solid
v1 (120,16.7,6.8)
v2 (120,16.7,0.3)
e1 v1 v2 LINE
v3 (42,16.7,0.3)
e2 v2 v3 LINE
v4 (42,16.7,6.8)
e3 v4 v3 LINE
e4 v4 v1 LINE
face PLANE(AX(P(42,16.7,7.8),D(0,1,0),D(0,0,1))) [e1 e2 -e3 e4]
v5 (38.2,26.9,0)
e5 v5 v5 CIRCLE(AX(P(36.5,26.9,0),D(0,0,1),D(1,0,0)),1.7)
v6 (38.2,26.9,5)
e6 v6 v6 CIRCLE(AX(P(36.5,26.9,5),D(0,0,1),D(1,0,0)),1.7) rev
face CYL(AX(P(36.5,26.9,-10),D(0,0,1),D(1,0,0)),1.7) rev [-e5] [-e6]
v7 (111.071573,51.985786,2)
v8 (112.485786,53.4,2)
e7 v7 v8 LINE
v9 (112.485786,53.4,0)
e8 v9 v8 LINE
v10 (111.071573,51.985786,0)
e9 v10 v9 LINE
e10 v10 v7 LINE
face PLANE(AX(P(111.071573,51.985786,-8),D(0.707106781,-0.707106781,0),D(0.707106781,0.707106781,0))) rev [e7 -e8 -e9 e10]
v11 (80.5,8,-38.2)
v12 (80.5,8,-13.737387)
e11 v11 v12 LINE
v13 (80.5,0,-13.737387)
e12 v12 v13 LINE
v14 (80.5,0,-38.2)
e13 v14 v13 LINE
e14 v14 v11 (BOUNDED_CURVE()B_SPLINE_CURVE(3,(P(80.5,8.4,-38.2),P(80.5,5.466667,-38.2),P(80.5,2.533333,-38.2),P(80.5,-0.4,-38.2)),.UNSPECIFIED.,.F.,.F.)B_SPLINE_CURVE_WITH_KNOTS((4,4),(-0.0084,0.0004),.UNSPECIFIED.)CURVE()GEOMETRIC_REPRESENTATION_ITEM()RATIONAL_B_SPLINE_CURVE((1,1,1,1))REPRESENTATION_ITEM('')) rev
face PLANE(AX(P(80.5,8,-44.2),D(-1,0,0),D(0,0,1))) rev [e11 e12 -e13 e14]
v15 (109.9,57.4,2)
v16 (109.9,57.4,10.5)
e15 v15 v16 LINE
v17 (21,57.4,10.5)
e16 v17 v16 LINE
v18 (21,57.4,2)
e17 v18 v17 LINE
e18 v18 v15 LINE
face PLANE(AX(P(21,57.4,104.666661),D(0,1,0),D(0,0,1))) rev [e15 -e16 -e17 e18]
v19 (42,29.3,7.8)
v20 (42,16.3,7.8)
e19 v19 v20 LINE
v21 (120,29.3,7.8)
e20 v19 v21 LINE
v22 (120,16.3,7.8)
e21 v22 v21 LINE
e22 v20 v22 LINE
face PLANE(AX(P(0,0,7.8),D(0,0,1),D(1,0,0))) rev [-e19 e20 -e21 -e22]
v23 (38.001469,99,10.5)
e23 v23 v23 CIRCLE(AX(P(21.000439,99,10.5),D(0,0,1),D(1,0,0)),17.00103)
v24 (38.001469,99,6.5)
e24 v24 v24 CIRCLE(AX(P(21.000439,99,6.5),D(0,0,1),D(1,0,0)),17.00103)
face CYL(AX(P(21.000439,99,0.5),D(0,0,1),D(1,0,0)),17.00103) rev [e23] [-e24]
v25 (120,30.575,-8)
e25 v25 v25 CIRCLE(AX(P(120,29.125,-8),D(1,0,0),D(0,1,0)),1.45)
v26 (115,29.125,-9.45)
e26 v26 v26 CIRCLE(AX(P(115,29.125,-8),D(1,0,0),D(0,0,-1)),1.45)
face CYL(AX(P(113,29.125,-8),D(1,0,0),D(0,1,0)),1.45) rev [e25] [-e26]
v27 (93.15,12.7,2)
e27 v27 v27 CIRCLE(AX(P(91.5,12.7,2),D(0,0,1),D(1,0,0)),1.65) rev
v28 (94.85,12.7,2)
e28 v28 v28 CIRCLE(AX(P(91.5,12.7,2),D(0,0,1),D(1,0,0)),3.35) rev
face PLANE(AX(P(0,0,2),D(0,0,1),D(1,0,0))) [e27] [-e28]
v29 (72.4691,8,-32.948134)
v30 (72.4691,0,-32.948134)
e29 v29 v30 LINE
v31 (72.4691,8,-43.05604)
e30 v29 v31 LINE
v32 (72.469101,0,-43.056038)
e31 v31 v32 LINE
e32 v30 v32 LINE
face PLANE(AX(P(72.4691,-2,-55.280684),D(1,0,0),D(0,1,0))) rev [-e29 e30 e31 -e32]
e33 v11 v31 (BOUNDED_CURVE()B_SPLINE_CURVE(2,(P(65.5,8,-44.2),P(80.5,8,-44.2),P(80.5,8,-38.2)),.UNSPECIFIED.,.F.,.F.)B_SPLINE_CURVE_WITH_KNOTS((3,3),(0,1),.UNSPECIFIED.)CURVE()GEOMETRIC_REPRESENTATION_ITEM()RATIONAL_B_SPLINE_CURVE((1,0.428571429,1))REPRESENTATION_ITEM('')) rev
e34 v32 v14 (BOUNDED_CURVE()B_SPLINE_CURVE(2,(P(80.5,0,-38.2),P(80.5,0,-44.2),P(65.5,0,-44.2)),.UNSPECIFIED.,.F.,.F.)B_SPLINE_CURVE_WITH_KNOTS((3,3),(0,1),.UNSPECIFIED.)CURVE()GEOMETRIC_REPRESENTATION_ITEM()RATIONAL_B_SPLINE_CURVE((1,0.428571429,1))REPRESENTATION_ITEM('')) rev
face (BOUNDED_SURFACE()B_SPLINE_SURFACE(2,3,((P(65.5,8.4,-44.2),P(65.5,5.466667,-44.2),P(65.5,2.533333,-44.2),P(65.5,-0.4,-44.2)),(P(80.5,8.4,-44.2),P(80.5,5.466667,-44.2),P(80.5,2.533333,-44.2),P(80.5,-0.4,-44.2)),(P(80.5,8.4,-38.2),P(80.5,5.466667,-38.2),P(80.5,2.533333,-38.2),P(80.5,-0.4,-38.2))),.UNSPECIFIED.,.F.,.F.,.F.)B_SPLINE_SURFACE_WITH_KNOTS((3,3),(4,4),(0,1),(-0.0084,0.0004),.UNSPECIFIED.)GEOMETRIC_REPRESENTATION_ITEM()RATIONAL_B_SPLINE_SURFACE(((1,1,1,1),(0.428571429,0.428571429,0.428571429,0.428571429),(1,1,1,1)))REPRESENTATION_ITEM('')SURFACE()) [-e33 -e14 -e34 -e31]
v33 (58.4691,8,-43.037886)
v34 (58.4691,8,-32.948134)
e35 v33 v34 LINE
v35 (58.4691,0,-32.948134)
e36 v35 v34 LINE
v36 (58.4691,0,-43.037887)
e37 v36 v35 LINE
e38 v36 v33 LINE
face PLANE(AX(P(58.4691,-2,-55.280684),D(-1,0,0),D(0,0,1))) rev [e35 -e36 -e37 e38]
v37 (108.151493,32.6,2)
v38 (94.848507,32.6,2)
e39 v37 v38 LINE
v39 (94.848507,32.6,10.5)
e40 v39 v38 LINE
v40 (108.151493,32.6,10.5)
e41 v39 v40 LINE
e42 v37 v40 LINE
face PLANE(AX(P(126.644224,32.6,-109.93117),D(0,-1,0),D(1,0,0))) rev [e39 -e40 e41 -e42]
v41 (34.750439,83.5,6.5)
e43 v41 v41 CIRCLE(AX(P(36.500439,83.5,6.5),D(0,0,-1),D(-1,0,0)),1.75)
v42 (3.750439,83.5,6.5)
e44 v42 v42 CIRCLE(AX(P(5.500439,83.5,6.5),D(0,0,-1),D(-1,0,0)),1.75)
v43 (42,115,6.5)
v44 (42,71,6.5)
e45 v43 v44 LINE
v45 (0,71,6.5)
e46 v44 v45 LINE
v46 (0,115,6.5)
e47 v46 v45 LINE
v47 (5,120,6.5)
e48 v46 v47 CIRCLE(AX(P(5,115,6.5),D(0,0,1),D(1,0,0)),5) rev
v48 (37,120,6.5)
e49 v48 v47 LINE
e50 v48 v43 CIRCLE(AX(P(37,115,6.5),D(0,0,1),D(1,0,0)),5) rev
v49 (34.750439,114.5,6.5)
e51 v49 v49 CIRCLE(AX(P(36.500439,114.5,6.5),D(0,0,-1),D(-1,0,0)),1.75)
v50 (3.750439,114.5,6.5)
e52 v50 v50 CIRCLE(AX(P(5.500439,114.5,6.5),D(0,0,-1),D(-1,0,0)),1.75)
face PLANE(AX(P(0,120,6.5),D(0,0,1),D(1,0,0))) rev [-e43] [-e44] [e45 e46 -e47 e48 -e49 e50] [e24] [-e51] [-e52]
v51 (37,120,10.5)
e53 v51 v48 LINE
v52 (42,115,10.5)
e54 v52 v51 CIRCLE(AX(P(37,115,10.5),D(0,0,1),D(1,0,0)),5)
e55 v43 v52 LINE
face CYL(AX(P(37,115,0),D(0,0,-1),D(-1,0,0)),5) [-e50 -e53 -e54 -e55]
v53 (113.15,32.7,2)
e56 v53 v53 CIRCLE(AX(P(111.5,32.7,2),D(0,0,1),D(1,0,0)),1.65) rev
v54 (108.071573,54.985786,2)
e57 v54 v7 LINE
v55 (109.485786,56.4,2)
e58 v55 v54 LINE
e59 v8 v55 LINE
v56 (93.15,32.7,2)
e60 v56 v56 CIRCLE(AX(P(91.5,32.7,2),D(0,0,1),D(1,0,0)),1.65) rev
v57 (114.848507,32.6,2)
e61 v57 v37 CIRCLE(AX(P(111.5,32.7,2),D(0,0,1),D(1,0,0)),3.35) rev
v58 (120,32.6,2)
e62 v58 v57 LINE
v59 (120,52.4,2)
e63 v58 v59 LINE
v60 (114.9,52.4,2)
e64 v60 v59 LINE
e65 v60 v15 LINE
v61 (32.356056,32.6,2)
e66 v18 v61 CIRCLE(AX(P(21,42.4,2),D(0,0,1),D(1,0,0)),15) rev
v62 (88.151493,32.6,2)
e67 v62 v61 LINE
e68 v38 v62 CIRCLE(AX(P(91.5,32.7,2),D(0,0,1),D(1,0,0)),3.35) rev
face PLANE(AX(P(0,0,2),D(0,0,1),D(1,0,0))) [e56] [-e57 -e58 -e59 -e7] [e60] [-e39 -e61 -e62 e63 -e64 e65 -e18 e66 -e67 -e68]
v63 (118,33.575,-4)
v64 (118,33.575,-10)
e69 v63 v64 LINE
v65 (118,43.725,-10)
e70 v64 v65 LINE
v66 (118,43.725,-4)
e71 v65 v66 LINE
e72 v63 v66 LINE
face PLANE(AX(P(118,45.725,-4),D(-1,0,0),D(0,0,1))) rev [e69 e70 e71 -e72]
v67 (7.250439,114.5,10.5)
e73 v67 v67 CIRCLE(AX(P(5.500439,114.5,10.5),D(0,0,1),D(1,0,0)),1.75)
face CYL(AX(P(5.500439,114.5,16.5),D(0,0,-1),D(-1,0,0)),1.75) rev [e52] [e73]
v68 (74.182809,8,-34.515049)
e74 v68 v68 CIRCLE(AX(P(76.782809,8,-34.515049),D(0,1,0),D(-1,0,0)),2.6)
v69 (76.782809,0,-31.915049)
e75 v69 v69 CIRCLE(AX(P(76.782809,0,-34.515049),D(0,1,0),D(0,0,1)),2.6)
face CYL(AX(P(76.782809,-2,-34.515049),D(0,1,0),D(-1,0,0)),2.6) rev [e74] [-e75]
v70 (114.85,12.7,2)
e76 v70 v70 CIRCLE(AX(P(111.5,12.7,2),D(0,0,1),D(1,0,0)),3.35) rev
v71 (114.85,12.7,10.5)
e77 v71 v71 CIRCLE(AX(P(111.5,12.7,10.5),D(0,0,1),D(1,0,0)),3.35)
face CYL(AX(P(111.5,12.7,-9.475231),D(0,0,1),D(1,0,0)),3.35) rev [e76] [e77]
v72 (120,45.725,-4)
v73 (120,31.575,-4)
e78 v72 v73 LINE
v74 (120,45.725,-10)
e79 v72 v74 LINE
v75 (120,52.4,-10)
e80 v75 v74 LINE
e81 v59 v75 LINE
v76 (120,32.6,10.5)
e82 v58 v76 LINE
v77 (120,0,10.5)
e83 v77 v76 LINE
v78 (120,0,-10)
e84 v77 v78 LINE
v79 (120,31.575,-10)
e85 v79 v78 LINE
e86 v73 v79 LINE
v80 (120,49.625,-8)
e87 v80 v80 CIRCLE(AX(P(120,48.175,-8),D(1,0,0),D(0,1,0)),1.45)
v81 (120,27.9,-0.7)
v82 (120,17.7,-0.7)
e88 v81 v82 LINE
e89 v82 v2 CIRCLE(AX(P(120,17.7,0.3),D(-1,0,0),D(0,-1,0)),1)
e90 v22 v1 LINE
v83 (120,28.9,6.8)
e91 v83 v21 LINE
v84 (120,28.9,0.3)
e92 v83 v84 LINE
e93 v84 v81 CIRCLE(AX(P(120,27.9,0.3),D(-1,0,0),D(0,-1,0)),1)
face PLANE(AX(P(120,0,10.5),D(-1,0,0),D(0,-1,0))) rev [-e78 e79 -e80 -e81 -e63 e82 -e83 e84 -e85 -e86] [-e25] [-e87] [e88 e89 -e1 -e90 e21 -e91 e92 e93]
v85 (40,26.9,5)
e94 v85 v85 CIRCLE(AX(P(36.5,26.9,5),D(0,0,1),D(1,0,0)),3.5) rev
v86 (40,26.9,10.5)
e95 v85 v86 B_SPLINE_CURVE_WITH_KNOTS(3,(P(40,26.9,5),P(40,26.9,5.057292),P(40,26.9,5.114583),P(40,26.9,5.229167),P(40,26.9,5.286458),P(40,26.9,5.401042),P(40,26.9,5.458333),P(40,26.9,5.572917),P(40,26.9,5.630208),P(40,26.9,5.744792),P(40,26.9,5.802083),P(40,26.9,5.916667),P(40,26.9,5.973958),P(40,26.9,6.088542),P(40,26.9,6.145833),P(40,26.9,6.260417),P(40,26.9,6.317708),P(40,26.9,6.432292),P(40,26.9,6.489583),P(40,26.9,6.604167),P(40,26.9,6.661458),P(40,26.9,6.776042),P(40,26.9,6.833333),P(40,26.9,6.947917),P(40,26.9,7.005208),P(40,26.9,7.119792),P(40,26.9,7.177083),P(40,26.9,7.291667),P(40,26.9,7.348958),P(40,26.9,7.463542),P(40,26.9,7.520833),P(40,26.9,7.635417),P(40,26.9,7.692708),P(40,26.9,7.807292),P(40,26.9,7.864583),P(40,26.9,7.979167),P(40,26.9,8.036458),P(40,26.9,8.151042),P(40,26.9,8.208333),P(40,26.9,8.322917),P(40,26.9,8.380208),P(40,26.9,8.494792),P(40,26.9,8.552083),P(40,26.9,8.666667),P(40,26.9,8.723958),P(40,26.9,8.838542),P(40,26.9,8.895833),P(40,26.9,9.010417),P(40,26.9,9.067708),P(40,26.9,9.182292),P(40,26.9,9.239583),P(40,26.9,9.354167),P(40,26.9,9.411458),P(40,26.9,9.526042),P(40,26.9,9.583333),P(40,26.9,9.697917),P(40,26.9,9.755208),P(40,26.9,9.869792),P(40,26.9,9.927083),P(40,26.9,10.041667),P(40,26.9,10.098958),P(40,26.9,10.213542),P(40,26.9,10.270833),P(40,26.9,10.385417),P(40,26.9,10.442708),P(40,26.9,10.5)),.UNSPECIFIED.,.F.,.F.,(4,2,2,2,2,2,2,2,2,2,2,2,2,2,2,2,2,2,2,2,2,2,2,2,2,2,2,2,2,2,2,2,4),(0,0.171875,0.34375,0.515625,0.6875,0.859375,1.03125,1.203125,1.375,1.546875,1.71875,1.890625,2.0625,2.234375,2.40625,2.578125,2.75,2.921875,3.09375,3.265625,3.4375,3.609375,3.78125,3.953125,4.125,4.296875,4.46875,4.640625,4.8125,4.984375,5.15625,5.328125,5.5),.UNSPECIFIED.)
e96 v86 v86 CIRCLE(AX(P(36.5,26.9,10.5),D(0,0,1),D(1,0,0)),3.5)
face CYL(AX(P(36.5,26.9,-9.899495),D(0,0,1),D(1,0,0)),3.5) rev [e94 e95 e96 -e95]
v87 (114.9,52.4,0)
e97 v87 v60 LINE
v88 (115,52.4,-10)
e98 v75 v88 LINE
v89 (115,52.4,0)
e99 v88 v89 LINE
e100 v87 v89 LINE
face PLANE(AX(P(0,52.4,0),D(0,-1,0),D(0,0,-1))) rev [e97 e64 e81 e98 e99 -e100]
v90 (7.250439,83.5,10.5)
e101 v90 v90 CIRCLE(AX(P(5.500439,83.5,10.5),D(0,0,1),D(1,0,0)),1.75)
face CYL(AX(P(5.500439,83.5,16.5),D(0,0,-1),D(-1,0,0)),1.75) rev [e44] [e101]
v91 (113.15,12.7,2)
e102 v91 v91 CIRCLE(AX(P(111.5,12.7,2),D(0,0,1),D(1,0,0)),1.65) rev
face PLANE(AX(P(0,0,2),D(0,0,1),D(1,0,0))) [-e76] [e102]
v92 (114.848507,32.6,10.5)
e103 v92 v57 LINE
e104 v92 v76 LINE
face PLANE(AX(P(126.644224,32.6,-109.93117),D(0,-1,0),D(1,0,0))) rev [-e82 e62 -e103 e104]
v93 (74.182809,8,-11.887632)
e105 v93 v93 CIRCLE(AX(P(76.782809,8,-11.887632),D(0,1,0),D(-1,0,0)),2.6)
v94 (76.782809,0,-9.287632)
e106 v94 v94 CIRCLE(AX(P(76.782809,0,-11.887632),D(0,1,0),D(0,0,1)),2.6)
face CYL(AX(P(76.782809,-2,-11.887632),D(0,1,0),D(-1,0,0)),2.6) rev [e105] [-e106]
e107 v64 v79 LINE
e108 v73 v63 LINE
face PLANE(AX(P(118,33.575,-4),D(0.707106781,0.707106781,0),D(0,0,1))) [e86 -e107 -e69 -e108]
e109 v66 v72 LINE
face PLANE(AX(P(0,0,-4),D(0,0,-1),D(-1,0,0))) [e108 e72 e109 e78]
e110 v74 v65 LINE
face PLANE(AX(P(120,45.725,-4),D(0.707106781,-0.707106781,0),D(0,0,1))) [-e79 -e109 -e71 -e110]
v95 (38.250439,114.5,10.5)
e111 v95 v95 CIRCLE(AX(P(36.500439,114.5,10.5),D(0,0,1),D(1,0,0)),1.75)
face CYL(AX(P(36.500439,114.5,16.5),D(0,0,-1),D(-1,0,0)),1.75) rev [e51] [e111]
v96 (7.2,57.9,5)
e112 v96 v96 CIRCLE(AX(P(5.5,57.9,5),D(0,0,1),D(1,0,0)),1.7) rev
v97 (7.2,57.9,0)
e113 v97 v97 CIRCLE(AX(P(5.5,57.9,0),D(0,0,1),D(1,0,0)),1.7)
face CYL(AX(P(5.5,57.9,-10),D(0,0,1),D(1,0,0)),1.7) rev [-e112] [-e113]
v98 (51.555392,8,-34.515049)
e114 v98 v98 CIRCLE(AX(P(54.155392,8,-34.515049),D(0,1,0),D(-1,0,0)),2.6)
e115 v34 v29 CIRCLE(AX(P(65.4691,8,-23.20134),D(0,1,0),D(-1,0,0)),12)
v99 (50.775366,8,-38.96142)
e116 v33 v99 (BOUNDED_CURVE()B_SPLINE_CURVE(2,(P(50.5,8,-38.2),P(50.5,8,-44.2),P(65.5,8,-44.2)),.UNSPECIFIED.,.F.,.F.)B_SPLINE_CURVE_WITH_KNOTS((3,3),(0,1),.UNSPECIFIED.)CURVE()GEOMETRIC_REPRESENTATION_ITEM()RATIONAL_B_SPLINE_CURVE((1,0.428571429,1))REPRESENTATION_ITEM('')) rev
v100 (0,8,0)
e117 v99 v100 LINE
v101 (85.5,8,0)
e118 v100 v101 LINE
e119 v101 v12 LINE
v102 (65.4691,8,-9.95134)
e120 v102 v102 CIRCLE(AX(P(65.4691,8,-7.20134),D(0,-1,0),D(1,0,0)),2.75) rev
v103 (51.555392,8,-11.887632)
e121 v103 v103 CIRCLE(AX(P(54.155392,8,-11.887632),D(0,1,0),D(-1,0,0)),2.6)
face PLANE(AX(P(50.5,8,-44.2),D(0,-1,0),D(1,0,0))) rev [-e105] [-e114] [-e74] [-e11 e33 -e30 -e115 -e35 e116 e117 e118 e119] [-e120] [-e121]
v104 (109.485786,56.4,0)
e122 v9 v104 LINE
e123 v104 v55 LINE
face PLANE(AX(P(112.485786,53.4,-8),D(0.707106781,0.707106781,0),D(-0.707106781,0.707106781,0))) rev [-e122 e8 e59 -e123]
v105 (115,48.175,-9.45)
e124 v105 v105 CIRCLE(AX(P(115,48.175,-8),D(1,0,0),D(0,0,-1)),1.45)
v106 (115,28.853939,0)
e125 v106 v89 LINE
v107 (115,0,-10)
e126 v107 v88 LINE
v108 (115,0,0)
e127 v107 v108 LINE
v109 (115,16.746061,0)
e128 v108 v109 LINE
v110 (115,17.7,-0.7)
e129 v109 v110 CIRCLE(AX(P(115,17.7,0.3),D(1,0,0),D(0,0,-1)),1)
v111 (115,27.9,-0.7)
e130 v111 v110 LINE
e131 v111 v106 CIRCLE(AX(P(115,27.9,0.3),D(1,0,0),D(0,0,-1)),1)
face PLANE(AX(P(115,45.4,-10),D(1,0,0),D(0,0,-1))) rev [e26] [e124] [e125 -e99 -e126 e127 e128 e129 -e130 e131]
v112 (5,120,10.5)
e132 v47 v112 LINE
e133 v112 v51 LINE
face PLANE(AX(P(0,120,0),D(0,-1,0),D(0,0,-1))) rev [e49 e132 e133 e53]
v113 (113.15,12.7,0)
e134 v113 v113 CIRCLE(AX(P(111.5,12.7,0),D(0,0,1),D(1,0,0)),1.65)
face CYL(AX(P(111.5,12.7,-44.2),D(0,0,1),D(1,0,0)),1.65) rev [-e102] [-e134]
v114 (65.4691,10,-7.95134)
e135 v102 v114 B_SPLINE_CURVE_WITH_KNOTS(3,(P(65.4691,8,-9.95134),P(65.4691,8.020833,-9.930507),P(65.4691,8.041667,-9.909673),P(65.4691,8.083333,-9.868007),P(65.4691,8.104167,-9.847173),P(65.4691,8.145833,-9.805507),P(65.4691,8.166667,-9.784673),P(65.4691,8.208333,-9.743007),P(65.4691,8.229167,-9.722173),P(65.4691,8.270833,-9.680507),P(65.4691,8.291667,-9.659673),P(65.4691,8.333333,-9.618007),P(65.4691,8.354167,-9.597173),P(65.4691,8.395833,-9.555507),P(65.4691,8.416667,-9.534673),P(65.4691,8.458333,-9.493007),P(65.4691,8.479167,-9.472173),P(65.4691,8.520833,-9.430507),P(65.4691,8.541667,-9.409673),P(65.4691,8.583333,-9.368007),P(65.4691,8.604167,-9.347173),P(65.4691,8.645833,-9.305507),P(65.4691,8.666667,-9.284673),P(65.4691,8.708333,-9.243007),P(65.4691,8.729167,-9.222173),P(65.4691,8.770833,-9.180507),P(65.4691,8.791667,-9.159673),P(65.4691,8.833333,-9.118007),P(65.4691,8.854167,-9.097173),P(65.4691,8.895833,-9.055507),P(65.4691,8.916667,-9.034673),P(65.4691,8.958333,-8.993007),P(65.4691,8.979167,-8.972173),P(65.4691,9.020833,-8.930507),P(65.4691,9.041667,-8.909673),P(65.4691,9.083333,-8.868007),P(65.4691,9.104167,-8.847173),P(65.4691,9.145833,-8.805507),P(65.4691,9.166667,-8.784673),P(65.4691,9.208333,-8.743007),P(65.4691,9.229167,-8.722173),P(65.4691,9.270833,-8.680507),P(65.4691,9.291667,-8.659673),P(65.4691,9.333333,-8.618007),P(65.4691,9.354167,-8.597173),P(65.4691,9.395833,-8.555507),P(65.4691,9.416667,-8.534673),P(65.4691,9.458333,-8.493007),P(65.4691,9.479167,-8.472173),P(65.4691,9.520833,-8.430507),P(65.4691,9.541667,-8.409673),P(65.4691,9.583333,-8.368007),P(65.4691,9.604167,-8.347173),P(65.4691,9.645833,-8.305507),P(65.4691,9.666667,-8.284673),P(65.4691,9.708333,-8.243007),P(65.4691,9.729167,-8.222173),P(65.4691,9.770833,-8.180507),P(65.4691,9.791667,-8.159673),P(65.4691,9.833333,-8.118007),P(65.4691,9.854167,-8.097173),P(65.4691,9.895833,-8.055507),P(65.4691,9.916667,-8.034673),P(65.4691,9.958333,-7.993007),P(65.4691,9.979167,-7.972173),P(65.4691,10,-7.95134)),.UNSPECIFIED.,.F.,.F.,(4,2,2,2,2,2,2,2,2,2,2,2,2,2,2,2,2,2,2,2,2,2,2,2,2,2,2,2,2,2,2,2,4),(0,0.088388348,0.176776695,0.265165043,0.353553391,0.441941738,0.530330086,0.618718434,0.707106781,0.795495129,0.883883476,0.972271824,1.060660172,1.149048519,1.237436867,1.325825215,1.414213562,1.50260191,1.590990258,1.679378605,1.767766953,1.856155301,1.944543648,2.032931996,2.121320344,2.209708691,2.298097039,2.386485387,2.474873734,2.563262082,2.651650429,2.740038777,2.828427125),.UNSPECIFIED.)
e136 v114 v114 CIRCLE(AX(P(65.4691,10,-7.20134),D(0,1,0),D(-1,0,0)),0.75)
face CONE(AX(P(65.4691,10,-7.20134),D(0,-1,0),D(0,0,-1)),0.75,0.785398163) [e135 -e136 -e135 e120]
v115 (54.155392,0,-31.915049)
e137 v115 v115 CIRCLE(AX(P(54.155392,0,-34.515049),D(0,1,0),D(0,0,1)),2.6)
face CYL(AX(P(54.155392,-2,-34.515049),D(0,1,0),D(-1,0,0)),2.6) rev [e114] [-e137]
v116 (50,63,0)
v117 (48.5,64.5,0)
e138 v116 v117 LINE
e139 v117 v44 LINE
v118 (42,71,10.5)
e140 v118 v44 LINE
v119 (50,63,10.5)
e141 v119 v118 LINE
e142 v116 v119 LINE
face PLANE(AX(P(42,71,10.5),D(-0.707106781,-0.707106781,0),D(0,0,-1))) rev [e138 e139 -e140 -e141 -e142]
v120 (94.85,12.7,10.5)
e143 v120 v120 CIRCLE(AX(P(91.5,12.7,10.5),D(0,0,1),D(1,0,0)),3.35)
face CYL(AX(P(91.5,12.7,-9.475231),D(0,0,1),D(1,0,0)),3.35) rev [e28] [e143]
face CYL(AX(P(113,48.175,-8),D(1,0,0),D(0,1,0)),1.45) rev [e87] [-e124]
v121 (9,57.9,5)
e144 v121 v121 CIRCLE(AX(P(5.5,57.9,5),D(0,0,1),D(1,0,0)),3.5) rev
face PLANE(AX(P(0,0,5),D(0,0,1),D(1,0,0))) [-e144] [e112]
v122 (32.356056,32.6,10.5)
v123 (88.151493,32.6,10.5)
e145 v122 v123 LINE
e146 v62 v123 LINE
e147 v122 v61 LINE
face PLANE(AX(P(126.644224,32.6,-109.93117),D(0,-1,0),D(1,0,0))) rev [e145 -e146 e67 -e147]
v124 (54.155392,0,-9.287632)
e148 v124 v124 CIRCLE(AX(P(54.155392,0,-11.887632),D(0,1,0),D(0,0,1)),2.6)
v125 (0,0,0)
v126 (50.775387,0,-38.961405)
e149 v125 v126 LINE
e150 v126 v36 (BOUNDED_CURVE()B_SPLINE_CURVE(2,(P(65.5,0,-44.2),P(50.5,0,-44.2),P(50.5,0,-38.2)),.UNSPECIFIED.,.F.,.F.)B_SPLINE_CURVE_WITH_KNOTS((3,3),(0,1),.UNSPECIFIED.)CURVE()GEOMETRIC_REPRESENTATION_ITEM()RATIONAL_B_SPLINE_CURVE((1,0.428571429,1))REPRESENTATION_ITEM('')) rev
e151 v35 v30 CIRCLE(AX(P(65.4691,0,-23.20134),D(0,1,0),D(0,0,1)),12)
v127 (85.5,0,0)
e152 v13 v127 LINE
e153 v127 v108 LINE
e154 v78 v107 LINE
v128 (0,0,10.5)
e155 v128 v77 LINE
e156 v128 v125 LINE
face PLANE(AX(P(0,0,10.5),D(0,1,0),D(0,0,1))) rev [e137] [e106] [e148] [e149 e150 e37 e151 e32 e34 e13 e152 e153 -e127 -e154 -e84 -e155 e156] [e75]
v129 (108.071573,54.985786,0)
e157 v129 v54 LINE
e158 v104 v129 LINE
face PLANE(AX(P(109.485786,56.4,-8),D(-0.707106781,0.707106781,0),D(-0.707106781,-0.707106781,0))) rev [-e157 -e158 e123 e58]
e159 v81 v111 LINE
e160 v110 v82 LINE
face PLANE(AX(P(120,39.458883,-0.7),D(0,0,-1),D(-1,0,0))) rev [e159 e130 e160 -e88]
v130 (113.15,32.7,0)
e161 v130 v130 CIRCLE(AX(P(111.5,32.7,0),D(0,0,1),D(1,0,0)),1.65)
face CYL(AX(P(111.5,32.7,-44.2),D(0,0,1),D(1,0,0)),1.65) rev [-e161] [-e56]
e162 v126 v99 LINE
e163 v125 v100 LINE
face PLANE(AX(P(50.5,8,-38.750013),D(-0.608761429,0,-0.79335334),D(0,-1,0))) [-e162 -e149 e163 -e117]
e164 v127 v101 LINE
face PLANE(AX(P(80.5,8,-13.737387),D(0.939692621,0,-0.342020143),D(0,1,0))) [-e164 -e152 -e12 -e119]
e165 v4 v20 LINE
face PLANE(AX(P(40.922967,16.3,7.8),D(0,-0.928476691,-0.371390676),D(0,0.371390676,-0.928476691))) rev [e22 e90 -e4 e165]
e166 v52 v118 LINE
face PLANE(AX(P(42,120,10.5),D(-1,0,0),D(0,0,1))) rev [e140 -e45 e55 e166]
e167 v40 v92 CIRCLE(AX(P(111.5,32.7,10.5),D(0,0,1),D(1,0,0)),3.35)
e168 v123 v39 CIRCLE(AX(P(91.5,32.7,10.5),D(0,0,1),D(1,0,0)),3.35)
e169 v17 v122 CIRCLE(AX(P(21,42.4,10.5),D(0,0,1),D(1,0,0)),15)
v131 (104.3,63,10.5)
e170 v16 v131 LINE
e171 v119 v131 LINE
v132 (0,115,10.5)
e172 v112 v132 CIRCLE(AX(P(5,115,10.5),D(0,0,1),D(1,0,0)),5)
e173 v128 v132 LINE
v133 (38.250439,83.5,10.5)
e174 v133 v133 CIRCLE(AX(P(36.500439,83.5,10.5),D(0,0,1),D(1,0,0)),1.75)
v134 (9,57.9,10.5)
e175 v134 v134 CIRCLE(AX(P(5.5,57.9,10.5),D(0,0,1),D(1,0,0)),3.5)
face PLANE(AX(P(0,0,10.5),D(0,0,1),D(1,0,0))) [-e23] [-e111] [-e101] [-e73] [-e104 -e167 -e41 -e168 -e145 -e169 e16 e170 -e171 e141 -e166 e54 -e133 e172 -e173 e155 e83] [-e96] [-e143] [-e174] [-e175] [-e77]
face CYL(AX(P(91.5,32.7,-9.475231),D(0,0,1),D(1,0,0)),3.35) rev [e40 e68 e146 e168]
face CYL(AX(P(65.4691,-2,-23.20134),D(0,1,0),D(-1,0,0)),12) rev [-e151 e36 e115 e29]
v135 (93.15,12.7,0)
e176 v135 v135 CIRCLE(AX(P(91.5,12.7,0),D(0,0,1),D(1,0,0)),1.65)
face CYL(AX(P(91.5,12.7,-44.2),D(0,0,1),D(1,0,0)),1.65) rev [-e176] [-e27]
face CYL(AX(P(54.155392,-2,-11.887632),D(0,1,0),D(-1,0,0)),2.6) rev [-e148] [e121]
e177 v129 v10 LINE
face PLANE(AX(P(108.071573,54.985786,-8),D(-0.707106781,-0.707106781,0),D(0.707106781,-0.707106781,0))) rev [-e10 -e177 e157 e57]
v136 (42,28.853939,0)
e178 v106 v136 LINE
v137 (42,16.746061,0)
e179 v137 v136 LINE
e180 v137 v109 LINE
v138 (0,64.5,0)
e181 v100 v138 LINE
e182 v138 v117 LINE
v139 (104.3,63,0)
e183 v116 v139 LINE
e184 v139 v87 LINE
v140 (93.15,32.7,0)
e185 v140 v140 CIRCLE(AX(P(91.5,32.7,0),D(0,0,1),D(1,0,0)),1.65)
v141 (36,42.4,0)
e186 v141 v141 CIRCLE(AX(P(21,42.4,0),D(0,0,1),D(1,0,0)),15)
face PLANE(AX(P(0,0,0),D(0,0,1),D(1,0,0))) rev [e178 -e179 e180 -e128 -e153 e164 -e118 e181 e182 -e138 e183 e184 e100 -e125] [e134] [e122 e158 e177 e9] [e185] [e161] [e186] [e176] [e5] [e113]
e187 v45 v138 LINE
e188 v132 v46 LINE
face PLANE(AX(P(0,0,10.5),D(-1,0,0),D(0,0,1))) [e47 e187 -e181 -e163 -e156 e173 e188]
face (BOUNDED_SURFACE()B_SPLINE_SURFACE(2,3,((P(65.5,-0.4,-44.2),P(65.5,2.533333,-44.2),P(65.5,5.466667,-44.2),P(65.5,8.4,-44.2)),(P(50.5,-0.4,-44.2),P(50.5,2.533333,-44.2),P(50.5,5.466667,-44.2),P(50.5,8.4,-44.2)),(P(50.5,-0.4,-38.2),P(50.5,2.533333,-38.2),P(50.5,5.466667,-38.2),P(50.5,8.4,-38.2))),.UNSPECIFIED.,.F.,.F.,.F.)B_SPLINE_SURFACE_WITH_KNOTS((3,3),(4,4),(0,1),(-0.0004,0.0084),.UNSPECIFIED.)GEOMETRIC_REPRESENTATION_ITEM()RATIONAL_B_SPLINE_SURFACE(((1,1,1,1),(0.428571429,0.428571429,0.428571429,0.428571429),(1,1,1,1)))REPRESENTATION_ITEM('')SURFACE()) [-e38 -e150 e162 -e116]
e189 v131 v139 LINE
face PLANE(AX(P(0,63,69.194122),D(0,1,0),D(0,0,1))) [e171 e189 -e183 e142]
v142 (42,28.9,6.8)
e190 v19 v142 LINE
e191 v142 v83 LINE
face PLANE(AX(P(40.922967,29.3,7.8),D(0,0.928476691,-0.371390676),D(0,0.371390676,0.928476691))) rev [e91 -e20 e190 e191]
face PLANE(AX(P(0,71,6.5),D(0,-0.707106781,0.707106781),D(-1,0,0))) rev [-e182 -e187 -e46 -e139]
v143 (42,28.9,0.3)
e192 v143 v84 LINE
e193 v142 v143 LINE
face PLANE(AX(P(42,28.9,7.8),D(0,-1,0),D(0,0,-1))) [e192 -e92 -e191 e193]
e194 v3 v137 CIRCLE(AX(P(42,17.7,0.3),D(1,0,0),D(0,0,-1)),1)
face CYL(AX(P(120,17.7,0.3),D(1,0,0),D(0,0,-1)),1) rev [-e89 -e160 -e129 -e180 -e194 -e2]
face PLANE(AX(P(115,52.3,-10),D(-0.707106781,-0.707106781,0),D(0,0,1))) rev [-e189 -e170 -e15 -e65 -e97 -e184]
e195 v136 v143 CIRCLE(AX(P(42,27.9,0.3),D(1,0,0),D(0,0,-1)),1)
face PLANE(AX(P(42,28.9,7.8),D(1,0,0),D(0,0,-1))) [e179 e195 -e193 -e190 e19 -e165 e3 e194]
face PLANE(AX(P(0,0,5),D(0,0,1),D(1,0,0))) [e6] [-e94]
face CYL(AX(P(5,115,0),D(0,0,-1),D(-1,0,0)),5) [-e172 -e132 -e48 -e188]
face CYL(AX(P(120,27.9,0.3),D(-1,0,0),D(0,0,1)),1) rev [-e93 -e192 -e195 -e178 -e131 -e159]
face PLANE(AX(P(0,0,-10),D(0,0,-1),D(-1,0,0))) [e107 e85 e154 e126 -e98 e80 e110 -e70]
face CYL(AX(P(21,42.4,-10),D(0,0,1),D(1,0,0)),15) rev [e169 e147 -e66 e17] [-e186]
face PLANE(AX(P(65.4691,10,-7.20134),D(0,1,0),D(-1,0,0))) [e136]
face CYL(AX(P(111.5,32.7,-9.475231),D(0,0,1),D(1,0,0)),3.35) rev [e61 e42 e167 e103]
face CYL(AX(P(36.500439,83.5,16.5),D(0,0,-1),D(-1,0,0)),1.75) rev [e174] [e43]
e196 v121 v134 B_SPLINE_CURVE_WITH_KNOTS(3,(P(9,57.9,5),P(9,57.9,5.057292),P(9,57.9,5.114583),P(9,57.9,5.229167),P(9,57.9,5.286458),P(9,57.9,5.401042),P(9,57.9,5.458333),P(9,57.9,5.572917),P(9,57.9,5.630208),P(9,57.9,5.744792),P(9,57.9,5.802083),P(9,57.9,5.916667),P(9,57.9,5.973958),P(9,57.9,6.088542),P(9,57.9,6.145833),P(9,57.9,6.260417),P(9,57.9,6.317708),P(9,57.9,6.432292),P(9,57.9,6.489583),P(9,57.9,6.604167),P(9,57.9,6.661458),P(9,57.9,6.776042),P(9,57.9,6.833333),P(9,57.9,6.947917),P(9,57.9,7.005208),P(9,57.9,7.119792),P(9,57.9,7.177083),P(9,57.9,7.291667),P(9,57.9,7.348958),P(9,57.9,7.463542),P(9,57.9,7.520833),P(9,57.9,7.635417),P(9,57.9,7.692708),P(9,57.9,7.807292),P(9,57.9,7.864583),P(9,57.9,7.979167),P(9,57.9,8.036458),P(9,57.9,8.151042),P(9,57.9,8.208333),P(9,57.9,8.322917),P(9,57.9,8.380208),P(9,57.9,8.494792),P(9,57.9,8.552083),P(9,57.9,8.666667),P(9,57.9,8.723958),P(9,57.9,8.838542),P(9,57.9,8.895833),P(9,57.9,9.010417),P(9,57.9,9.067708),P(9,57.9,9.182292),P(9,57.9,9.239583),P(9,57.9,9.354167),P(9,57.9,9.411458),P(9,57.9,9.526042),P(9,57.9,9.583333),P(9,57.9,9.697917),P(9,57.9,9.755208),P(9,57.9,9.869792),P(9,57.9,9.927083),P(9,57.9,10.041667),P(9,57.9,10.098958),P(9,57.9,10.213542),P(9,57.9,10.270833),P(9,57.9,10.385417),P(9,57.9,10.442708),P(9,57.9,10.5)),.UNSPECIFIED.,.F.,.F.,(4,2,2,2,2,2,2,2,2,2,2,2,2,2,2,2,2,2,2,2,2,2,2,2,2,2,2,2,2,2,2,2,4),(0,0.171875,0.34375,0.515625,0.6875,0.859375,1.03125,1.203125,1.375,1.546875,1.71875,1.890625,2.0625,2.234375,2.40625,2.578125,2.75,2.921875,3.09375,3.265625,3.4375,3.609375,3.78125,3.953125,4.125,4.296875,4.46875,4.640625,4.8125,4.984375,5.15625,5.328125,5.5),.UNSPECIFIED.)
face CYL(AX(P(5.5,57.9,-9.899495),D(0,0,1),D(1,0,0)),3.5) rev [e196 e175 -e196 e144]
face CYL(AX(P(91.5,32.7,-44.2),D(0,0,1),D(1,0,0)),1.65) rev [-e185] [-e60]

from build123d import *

# Parameters (mm, degrees)
SKETCH1_W               = 120
SKETCH1_H               = 45.4
BOSS_EXTRUDE1_DEPTH     = 10.5
SKETCH2_W               = 5
SKETCH2_H               = 45.4
BOSS_EXTRUDE2_DEPTH     = 10
CUT_EXTRUDE1_DEPTH      = 7.8
CUT_EXTRUDE1_DEPTH_BACK = 129.729988736
SKETCH3_W               = 78
SKETCH3_H               = 12.2
BOSS_EXTRUDE3_START     = -10.5
SKETCH4_W               = 42
SKETCH4_H               = 41
BOSS_EXTRUDE3_DEPTH     = 10.5
SKETCH5_R               = 15
SKETCH5_R_2             = 1.7
CUT_EXTRUDE2_DEPTH      = 138.073885186
SKETCH7_W               = 30
SKETCH7_H               = 8
BOSS_EXTRUDE4_DEPTH     = 44.2
SKETCH8_R               = 1.65
CUT_EXTRUDE4_DEPTH      = 147.154336234
FILLET1_SIZE            = 15
FILLET1_SIZE_2          = 6
SKETCH9_R               = 2.6
SKETCH9_R_2             = 12
CUT_EXTRUDE5_DEPTH      = 10
SKETCH10_R              = 3.35
CUT_EXTRUDE6_DEPTH      = 8.5
SKETCH12_R              = 3.5
CUT_EXTRUDE7_DEPTH      = 5.5
SKETCH6_W               = 105.644224039
SKETCH6_H               = 30.4
CUT_EXTRUDE3_DEPTH      = 8.5
CHAMFER1_SIZE           = 5
CHAMFER1_SIZE2          = 13.737387097
SKETCH13_W              = 14
SKETCH13_H              = 32.158687744
CUT_EXTRUDE8_DEPTH      = 10
CUT_EXTRUDE16_DEPTH     = 78
SKETCH24_W              = 5
SKETCH24_H              = 9.3
BOSS_EXTRUDE8_DEPTH     = 12.2
FILLET4_START           = 115
FILLET4_DEPTH           = 5
FILLET4_START_2         = 41
FILLET4_2_DEPTH         = 79
SKETCH15_R              = 2.75
BOSS_EXTRUDE9_DEPTH     = 2
CHAMFER4_SIZE           = 2
CHAMFER5_DEPTH          = 8
SKETCH25_W              = 5
SKETCH25_H              = 12
BOSS_EXTRUDE10_DEPTH    = 7
SKETCH26_R              = 1.45
CUT_EXTRUDE17_DEPTH     = 7
SKETCH27_W              = 2
SKETCH27_H              = 14.15
CUT_EXTRUDE18_DEPTH     = 6
CHAMFER6_SIZE           = 2
SKETCH28_W              = 2
SKETCH28_H              = 17.6
BOSS_EXTRUDE11_DEPTH    = 73
SKETCH30_W              = 94
SKETCH30_H              = 5.6
BOSS_EXTRUDE12_DEPTH    = 8.5
CHAMFER8_SIZE           = 10.7
SKETCH31_W              = 42
SKETCH31_H              = 4
BOSS_EXTRUDE13_DEPTH    = 57
SKETCH32_R              = 17.001029839
CUT_EXTRUDE20_DEPTH     = 10
SKETCH33_R              = 1.75
CUT_EXTRUDE21_DEPTH     = 10
CHAMFER10_SIZE          = 8
FILLET6_R               = 5
CHAMFER11_SIZE          = 8
CUT_EXTRUDE22_DEPTH     = 10


with BuildPart() as part:
    # Sketch1 → Boss-Extrude1 (new body)
    with BuildSketch(Plane.XY):
        with Locations((60, 22.7)):
            Rectangle(SKETCH1_W, SKETCH1_H)
    extrude(amount=BOSS_EXTRUDE1_DEPTH)

    # Sketch2 → Boss-Extrude2 (add)
    with BuildSketch(Plane(origin=(0, 0, 0), x_dir=(-1, 0, 0), z_dir=(0, 0, -1))):
        with Locations((-117.5, 22.7)):
            Rectangle(SKETCH2_W, SKETCH2_H)
    extrude(amount=BOSS_EXTRUDE2_DEPTH)

    # Sketch3 → Cut-Extrude1 (cut, two sides: drawn at the far end of the back side and taken through both)
    with BuildSketch(Plane.XY.offset(-CUT_EXTRUDE1_DEPTH_BACK)):
        with Locations((81, 22.8)):
            Rectangle(SKETCH3_W, SKETCH3_H)
    extrude(amount=CUT_EXTRUDE1_DEPTH + CUT_EXTRUDE1_DEPTH_BACK, mode=Mode.SUBTRACT)

    # Sketch4 → Boss-Extrude3 (add)
    with BuildSketch(Plane(origin=(0, 0, 0), x_dir=(-1, 0, 0), z_dir=(0, 0, -1)).offset(BOSS_EXTRUDE3_START)):
        with Locations((-21, 42.5)):
            Rectangle(SKETCH4_W, SKETCH4_H)
    extrude(amount=BOSS_EXTRUDE3_DEPTH)

    # Sketch5 → Cut-Extrude2 (cut, through all)
    with BuildSketch(Plane.XY.offset(10.5)):
        with Locations((21, 42.4)):
            Circle(SKETCH5_R)
        with Locations((5.5, 57.9)):
            Circle(SKETCH5_R_2)
        with Locations((36.5, 26.9)):
            Circle(SKETCH5_R_2)
    extrude(amount=-CUT_EXTRUDE2_DEPTH, mode=Mode.SUBTRACT)

    # Sketch7 → Boss-Extrude4 (add)
    with BuildSketch(Plane(origin=(0, 0, 0), x_dir=(-1, 0, 0), z_dir=(0, 0, -1))):
        with Locations((-65.5, 4)):
            Rectangle(SKETCH7_W, SKETCH7_H)
    extrude(amount=BOSS_EXTRUDE4_DEPTH)

    # Sketch8 → Cut-Extrude4 (cut, through all)
    with BuildSketch(Plane.XY.offset(10.5)):
        with Locations((91.5, 32.7)):
            Circle(SKETCH8_R)
        with Locations((111.5, 32.7)):
            Circle(SKETCH8_R)
        with Locations((111.5, 12.7)):
            Circle(SKETCH8_R)
        with Locations((91.5, 12.7)):
            Circle(SKETCH8_R)
    extrude(amount=-CUT_EXTRUDE4_DEPTH, mode=Mode.SUBTRACT)

    # Fillet1
    # a fillet whose section is not a circle: 15, 6 mm, written as the material it takes off along each edge
    with BuildSketch(Plane(origin=(50.5, -37.5, -44.2), x_dir=(1, 0, 0), z_dir=(0, 1, 0))) as fillet1_piece_1:
        with BuildLine():
            Bezier((FILLET1_SIZE, 0), (0, 0), (0, -FILLET1_SIZE_2), weights=[1, 0.428571429, 1])
            Line((0, -FILLET1_SIZE_2), (0, 0))
            Line((0, 0), (FILLET1_SIZE, 0))
        make_face()
    extrude(amount=83, mode=Mode.SUBTRACT)
    with BuildSketch(Plane(origin=(80.5, 45.5, -44.2), x_dir=(0, 0, 1), z_dir=(0, -1, 0))) as fillet1_piece_2:
        with BuildLine():
            Bezier((FILLET1_SIZE_2, 0), (0, 0), (0, FILLET1_SIZE), weights=[1, 0.428571429, 1])
            Line((0, FILLET1_SIZE), (0, 0))
            Line((0, 0), (FILLET1_SIZE_2, 0))
        make_face()
    extrude(amount=83, mode=Mode.SUBTRACT)

    # Sketch9 → Cut-Extrude5 (cut)
    with BuildSketch(Plane(origin=(0, 8, 0), x_dir=(1, 0, 0), z_dir=(0, 1, 0))):
        with Locations(Location((54.155391929, 34.515048602, 0), (0, 0, 180))):
            Circle(SKETCH9_R)
        with Locations(Location((65.469100428, 39.201340103, 0), (0, 0, 180))):
            Circle(SKETCH9_R)
        with Locations(Location((76.782808927, 34.515048602, 0), (0, 0, 180))):
            Circle(SKETCH9_R)
        with Locations(Location((65.469100428, 23.201340103, 0), (0, 0, 180))):
            Circle(SKETCH9_R_2)
        with Locations(Location((54.155391929, 11.887631605, 0), (0, 0, 180))):
            Circle(SKETCH9_R)
        with Locations(Location((76.782808927, 11.887631605, 0), (0, 0, 180))):
            Circle(SKETCH9_R)
    extrude(amount=-CUT_EXTRUDE5_DEPTH, mode=Mode.SUBTRACT)

    # Sketch10 → Cut-Extrude6 (cut)
    with BuildSketch(Plane.XY.offset(10.5)):
        with Locations((91.5, 32.7)):
            Circle(SKETCH10_R)
        with Locations((111.5, 32.7)):
            Circle(SKETCH10_R)
        with Locations((111.5, 12.7)):
            Circle(SKETCH10_R)
        with Locations((91.5, 12.7)):
            Circle(SKETCH10_R)
    extrude(amount=-CUT_EXTRUDE6_DEPTH, mode=Mode.SUBTRACT)

    # Sketch12 → Cut-Extrude7 (cut)
    with BuildSketch(Plane.XY.offset(10.5)):
        with Locations((5.5, 57.9)):
            Circle(SKETCH12_R)
        with Locations((36.5, 26.9)):
            Circle(SKETCH12_R)
    extrude(amount=-CUT_EXTRUDE7_DEPTH, mode=Mode.SUBTRACT)

    # Sketch6 → Cut-Extrude3 (cut)
    with BuildSketch(Plane.XY.offset(10.5)):
        with Locations((73.822112019, 47.8)):
            Rectangle(SKETCH6_W, SKETCH6_H)
    extrude(amount=-CUT_EXTRUDE3_DEPTH, mode=Mode.SUBTRACT)

    # Chamfer1
    chamfer1_edges = [part.edges().sort_by_distance(p)[0] for p in [
        (80.5, 4, 0),
    ]]
    chamfer1_side = [part.faces().sort_by_distance(p)[0] for p in [
        (40.688741063, 22.8, 0),
    ]]
    chamfer(chamfer1_edges, length=CHAMFER1_SIZE, length2=CHAMFER1_SIZE2, reference=chamfer1_side[0])

    # Sketch13 → Cut-Extrude8 (cut)
    with BuildSketch(Plane(origin=(0, 8, 0), x_dir=(1, 0, 0), z_dir=(0, 1, 0))):
        with Locations((65.469100428, 39.201340103)):
            Rectangle(SKETCH13_W, SKETCH13_H)
    extrude(amount=-CUT_EXTRUDE8_DEPTH, mode=Mode.SUBTRACT)

    # Sketch23 → Cut-Extrude16 (cut)
    with BuildSketch(Plane(origin=(120, 0, 0), x_dir=(0, 0, -1), z_dir=(1, 0, 0))):
        Polygon((-6.8, 28.9), (-7.8, 28.9), (-7.8, 29.3), align=None)
        Polygon((-7.8, 16.7), (-7.8, 16.3), (-6.8, 16.7), align=None)
    extrude(amount=-CUT_EXTRUDE16_DEPTH, mode=Mode.SUBTRACT)

    # Sketch24 → Boss-Extrude8 (add)
    with BuildSketch(Plane(origin=(0, 16.7, 0), x_dir=(1, 0, 0), z_dir=(0, 1, 0))):
        with Locations((117.5, 5.35)):
            Rectangle(SKETCH24_W, SKETCH24_H)
    extrude(amount=BOSS_EXTRUDE8_DEPTH)

    # Fillet4: read off the stored shape, not the designer's step
    # Fillet4 outline → Fillet4 (add)
    with BuildSketch(Plane.YZ.offset(FILLET4_START)):
        with BuildLine():
            ThreePointArc((28.9, 0.3), (28.607106781, -0.407106781), (27.9, -0.7))
            Line((27.9, -0.7), (28.9, -0.7))
            Line((28.9, -0.7), (28.9, 0.3))
        make_face()
        with BuildLine():
            Line((16.7, 0.3), (16.7, -0.7))
            Line((16.7, -0.7), (17.7, -0.7))
            ThreePointArc((17.7, -0.7), (16.992893219, -0.407106781), (16.7, 0.3))
        make_face()
    extrude(amount=FILLET4_DEPTH)

    # Fillet4 2 outline → Fillet4 2 (add)
    with BuildSketch(Plane.YZ.offset(FILLET4_START_2)):
        with BuildLine():
            Line((28.9, 0), (28.9, 0.3))
            ThreePointArc((28.9, 0.3), (28.888417726, 0.148242301), (28.853939201, 0))
            Line((28.853939201, 0), (28.9, 0))
        make_face()
        with BuildLine():
            Line((16.7, 0), (16.746060799, 0))
            ThreePointArc((16.746060799, 0), (16.711582274, 0.148242301), (16.7, 0.3))
            Line((16.7, 0.3), (16.7, 0))
        make_face()
    extrude(amount=FILLET4_2_DEPTH)

    # Sketch15 → Boss-Extrude9 (add)
    with BuildSketch(Plane(origin=(0, 8, 0), x_dir=(1, 0, 0), z_dir=(0, 1, 0))):
        with Locations((65.469100428, 7.201340104)):
            Circle(SKETCH15_R)
    extrude(amount=BOSS_EXTRUDE9_DEPTH)

    # Chamfer4
    chamfer4_edges = [part.edges().sort_by_distance(p)[0] for p in [
        (62.719100428, 10, -7.201340104),
    ]]
    chamfer(chamfer4_edges, length=CHAMFER4_SIZE - 0.0001)  # a hair under: the kernel refuses the full size

    # Chamfer5: read off the stored shape, not the designer's step
    # Chamfer5 outline → Chamfer5 (add)
    with BuildSketch(Plane(origin=(0, 0, 0), x_dir=(1, 0, 0), z_dir=(0, 1, 0))):
        with BuildLine():
            add(Edge.make_bspline(
                [(50.775443099, 38.961367817), (50.5, 38.551094872), (50.5, 38.2)],
                knots=[0.873344875, 0.873344875, 0.873344875, 1, 1, 1], degree=2, weights=[0.873584452, 0.927625643, 1]))
            Line((50.775443099, 38.961367817), (0, 0))
            Line((0, 0), (50.5, 0))
            Line((50.5, 0), (50.5, 38.2))
        make_face()
    extrude(amount=CHAMFER5_DEPTH)

    # Sketch25 → Boss-Extrude10 (add)
    with BuildSketch(Plane(origin=(0, 45.4, 0), x_dir=(1, 0, 0), z_dir=(0, 1, 0))):
        with Locations((117.5, 4)):
            Rectangle(SKETCH25_W, SKETCH25_H)
    extrude(amount=BOSS_EXTRUDE10_DEPTH)

    # Sketch26 → Cut-Extrude17 (cut)
    with BuildSketch(Plane(origin=(120, 0, 0), x_dir=(0, 0, -1), z_dir=(1, 0, 0))):
        with Locations(Location((8, 48.175, 0), (0, 0, 90))):
            Circle(SKETCH26_R)
        with Locations(Location((8, 29.125, 0), (0, 0, 90))):
            Circle(SKETCH26_R)
    extrude(amount=-CUT_EXTRUDE17_DEPTH, mode=Mode.SUBTRACT)

    # Sketch27 → Cut-Extrude18 (cut)
    with BuildSketch(Plane(origin=(0, 0, -10), x_dir=(-1, 0, 0), z_dir=(0, 0, -1))):
        with Locations((-119, 38.65)):
            Rectangle(SKETCH27_W, SKETCH27_H)
    extrude(amount=-CUT_EXTRUDE18_DEPTH, mode=Mode.SUBTRACT)

    # Chamfer6
    chamfer6_edges = [part.edges().sort_by_distance(p)[0] for p in [
        (118, 45.725, -7),
        (118, 31.575, -7),
    ]]
    chamfer(chamfer6_edges, length=CHAMFER6_SIZE - 0.0001)  # a hair under: the kernel refuses the full size

    # Sketch28 → Boss-Extrude11 (add)
    with BuildSketch(Plane(origin=(42, 0, 0), x_dir=(0, 0, -1), z_dir=(1, 0, 0))):
        with Locations((-1, 54.2)):
            Rectangle(SKETCH28_W, SKETCH28_H)
    extrude(amount=BOSS_EXTRUDE11_DEPTH)

    # Sketch30 → Boss-Extrude12 (add)
    with BuildSketch(Plane.XY.offset(2)):
        with Locations((68, 60.2)):
            Rectangle(SKETCH30_W, SKETCH30_H)
    extrude(amount=BOSS_EXTRUDE12_DEPTH)

    # Chamfer8
    # the kernel refuses this chamfer: 10.7 mm, written as the material it takes off along each edge
    with BuildSketch(Plane(origin=(115, 63, -27.517007971), x_dir=(-1, 0, 0), z_dir=(0, 0, 1))) as chamfer8_piece_1_section:
        Polygon((CHAMFER8_SIZE, 0), (0, CHAMFER8_SIZE), (0, 0), align=None)
    chamfer8_piece_1 = extrude(amount=65.534015942, mode=Mode.PRIVATE)
    chamfer8_piece_1 = split(chamfer8_piece_1, bisect_by=Plane(origin=(115, 52.4, -27.517007971), z_dir=(0, 1, 0)), keep=Keep.TOP, mode=Mode.PRIVATE)
    add(chamfer8_piece_1, mode=Mode.SUBTRACT)

    # Sketch31 → Boss-Extrude13 (add)
    with BuildSketch(Plane(origin=(0, 63, 0), x_dir=(1, 0, 0), z_dir=(0, 1, 0))):
        with Locations((21, -8.5)):
            Rectangle(SKETCH31_W, SKETCH31_H)
    extrude(amount=BOSS_EXTRUDE13_DEPTH)

    # Sketch32 → Cut-Extrude20 (cut)
    with BuildSketch(Plane.XY.offset(10.5)):
        with Locations((21.000438713, 99)):
            Circle(SKETCH32_R)
    extrude(amount=-CUT_EXTRUDE20_DEPTH, mode=Mode.SUBTRACT)

    # Sketch33 → Cut-Extrude21 (cut)
    with BuildSketch(Plane(origin=(0, 0, 6.5), x_dir=(-1, 0, 0), z_dir=(0, 0, -1))):
        with Locations((-36.500438713, 114.5)):
            Circle(SKETCH33_R)
        with Locations((-5.500438713, 114.5)):
            Circle(SKETCH33_R)
        with Locations((-5.500438713, 83.5)):
            Circle(SKETCH33_R)
        with Locations((-36.500438713, 83.5)):
            Circle(SKETCH33_R)
    extrude(amount=-CUT_EXTRUDE21_DEPTH, mode=Mode.SUBTRACT)

    # Chamfer10
    chamfer10_edges = [part.edges().sort_by_distance(p)[0] for p in [
        (42, 63, 8.5),
    ]]
    chamfer(chamfer10_edges, length=CHAMFER10_SIZE)

    # Fillet6
    fillet6_edges = [part.edges().sort_by_distance(p)[0] for p in [
        (0, 120, 8.5),
        (42, 120, 8.5),
    ]]
    fillet(fillet6_edges, radius=FILLET6_R)

    # Chamfer11
    # the kernel refuses this chamfer: 8 mm, written as the material it adds along each edge
    with BuildSketch(Plane(origin=(0, 63, 6.5), x_dir=(0, 0, -1), z_dir=(1, 0, 0))) as chamfer11_piece_1_section:
        Polygon((CHAMFER11_SIZE, 0), (0, CHAMFER11_SIZE), (0, 0), align=None)
    chamfer11_piece_1 = extrude(amount=70.573463904, mode=Mode.PRIVATE)
    chamfer11_piece_1 = split(chamfer11_piece_1, bisect_by=Plane(origin=(42, 63, 6.5), z_dir=(-1, 0, 0)), keep=Keep.TOP, mode=Mode.PRIVATE)
    chamfer11_piece_1 = split(chamfer11_piece_1, bisect_by=Plane(origin=(0, 63, 0), z_dir=(0, 0, 1)), keep=Keep.TOP, mode=Mode.PRIVATE)
    add(chamfer11_piece_1)
    with BuildSketch(Plane(origin=(0, 63, 6.5), x_dir=(0, 0, -1), z_dir=(1, 0, 0))) as chamfer11_piece_2_section:
        Polygon((CHAMFER11_SIZE, 0), (0, CHAMFER11_SIZE), (0, 0), align=None)
    chamfer11_piece_2 = extrude(amount=70.573463904, mode=Mode.PRIVATE)
    chamfer11_piece_2 = split(chamfer11_piece_2, bisect_by=Plane(origin=(42, 63, 6.5), z_dir=(1, 0, 0)), keep=Keep.TOP, mode=Mode.PRIVATE)
    chamfer11_piece_2 = split(chamfer11_piece_2, bisect_by=Plane(origin=(25, 88, 6.5), z_dir=(-0.7071067811865476, -0.7071067811865476, 0)), keep=Keep.TOP, mode=Mode.PRIVATE)
    chamfer11_piece_2 = split(chamfer11_piece_2, bisect_by=Plane(origin=(0, 63, 0), z_dir=(0, 0, 1)), keep=Keep.TOP, mode=Mode.PRIVATE)
    add(chamfer11_piece_2)

    # Sketch34 → Cut-Extrude22 (cut)
    with BuildSketch(Plane.XY.offset(2)):
        Polygon((109.485786438, 56.4), (108.071572875, 54.985786438), (111.071572875, 51.985786438), (112.485786438, 53.4), align=None)
    extrude(amount=-CUT_EXTRUDE22_DEPTH, mode=Mode.SUBTRACT)


solid = part.part
